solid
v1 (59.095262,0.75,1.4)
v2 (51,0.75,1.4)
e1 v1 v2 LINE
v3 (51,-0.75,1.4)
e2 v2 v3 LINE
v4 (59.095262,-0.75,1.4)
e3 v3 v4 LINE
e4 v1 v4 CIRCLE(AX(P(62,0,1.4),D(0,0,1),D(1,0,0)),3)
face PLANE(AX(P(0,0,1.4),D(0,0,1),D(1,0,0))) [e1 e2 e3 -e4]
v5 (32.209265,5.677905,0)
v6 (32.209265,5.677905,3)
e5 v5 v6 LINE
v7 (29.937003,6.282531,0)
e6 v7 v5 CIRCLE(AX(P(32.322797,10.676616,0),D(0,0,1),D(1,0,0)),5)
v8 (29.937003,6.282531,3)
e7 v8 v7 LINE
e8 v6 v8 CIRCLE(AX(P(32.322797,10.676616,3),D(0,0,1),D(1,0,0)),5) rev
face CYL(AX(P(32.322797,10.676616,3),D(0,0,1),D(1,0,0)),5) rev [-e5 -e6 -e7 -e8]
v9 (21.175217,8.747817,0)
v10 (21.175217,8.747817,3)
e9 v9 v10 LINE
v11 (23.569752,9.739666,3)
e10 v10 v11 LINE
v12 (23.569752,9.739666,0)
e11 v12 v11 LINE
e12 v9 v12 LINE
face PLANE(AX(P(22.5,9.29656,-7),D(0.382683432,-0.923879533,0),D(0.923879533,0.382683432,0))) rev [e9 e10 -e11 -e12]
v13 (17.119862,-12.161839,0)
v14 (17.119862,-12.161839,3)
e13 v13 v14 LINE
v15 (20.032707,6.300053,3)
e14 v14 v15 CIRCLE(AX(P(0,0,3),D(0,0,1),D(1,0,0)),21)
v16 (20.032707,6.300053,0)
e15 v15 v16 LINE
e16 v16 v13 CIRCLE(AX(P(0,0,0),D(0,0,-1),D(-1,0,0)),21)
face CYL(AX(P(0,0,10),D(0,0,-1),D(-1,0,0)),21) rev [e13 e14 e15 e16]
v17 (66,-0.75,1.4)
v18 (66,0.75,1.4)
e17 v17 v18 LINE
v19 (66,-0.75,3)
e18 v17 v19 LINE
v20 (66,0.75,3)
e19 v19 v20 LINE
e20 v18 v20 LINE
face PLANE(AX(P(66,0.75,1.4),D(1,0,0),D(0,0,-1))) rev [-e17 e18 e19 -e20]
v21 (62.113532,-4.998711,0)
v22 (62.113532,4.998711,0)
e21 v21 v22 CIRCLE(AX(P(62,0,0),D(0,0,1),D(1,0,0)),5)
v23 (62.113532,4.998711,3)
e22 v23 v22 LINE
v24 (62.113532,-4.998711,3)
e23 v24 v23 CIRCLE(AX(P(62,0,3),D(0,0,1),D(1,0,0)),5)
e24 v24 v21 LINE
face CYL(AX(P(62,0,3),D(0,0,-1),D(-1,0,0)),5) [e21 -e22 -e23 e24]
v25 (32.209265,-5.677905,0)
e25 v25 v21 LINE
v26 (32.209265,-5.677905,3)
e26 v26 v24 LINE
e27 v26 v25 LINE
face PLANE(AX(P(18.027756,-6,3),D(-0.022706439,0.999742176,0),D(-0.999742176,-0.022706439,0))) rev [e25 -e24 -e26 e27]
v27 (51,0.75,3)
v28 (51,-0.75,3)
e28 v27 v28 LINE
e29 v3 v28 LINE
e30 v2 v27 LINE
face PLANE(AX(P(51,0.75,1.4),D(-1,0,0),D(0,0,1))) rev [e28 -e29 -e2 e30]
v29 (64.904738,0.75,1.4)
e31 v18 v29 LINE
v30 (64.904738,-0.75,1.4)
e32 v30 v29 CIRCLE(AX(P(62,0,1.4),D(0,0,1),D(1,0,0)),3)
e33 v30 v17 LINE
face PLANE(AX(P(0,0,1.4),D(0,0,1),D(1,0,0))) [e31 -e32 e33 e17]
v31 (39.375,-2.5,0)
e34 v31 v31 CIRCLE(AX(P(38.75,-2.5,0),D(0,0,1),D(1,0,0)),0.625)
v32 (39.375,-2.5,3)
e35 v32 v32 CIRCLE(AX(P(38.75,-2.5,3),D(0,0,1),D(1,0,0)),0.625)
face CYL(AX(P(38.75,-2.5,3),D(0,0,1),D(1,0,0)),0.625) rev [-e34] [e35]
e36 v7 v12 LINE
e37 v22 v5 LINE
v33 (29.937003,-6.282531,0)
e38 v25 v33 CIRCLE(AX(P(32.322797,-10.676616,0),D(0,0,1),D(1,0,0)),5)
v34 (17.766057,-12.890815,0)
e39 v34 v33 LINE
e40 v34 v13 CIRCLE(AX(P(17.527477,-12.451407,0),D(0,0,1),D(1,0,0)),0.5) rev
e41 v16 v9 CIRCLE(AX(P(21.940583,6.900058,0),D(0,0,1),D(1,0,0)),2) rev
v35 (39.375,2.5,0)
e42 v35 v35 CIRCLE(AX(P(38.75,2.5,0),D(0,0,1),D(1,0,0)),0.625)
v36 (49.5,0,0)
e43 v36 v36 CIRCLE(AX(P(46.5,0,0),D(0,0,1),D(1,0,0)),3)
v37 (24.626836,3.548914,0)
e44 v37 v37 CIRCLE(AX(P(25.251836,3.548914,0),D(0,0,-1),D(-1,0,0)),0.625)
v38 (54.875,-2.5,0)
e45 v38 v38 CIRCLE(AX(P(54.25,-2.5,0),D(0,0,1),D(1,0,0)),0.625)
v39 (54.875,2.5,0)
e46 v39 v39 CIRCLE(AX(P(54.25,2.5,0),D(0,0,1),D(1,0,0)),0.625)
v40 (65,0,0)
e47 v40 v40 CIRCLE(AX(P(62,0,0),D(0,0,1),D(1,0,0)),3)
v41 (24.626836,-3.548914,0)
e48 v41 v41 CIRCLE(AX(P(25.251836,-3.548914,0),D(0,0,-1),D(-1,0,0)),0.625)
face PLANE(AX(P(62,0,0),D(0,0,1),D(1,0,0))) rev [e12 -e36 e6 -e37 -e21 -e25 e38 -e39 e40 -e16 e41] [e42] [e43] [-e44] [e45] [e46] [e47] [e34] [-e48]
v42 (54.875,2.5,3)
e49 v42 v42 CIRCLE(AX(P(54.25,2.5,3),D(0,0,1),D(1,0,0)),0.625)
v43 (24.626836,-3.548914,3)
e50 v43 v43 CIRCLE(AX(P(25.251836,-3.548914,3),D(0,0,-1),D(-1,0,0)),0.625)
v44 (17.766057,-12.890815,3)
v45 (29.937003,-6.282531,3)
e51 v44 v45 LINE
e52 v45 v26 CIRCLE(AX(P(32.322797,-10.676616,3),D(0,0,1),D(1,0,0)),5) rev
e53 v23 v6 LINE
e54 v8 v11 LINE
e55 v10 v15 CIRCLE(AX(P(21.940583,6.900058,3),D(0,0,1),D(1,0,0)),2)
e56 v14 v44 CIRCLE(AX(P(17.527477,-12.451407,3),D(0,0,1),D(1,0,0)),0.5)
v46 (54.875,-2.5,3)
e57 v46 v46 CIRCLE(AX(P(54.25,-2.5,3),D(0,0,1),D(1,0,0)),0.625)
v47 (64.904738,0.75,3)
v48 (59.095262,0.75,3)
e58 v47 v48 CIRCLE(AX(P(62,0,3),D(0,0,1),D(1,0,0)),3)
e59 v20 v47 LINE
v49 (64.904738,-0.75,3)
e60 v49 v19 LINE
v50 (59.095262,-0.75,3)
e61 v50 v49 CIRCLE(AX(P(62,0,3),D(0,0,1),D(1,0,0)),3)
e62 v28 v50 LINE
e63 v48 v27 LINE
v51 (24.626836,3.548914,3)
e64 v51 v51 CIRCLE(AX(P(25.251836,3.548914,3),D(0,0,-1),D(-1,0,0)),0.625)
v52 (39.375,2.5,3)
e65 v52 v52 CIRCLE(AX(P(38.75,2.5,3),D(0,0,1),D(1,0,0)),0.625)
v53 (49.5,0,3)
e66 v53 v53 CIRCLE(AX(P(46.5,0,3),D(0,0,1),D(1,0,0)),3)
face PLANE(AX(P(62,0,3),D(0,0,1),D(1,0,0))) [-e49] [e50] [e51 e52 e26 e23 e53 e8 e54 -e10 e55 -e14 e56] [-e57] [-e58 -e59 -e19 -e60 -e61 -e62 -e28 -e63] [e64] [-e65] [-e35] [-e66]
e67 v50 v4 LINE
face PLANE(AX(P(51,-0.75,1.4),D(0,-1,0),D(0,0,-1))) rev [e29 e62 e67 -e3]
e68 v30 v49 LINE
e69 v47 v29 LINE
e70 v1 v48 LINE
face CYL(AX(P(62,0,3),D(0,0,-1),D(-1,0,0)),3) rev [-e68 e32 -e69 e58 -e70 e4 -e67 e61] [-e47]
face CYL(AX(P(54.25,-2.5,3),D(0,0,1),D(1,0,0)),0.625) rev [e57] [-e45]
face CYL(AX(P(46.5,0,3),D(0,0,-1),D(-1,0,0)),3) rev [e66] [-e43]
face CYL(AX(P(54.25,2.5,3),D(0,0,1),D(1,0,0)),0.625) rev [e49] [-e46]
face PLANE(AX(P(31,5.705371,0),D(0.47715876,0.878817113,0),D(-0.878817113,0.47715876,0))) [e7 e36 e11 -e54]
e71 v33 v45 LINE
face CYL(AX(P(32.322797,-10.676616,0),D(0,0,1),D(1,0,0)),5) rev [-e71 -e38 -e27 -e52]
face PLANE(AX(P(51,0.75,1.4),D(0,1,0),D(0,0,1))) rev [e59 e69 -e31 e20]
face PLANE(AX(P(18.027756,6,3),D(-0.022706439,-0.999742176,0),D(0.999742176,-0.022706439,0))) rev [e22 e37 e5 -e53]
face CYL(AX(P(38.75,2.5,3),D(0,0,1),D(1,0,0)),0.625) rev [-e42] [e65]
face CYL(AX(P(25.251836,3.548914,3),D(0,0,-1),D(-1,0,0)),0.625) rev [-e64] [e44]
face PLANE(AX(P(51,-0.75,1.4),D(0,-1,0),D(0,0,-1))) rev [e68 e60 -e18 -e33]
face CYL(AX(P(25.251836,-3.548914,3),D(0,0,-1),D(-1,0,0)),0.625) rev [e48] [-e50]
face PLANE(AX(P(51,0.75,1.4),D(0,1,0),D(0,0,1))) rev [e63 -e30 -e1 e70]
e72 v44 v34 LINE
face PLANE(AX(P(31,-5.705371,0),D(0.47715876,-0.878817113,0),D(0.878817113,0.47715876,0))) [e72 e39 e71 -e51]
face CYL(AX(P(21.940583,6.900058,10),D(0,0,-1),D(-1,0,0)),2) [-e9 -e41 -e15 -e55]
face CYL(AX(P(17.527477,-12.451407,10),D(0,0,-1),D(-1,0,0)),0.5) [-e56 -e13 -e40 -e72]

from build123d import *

# Parameters (mm, degrees)
SKETCH1_R                  = 14
SKETCH1_R_2                = 3
BOSS_EXTRUDE1_DEPTH        = 3
M1_6_CLEARANCE_HOLE2_D     = 1.8
M1_6_CLEARANCE_HOLE2_DEPTH = 11.5
CIRPATTERN1_COUNT          = 12
TROU_TARAUD_M1_61_D        = 1.25
CHAMFER2_SIZE              = 11.586303909
ESQUISSE1_R                = 21
ENL_V_MAT_EXTRU_1_DEPTH    = 10
ESQUISSE3_R                = 0.625
ENL_V_MAT_EXTRU_2_DEPTH    = 69.11418111
ESQUISSE5_W                = 15
ESQUISSE5_H                = 1.5
ENL_V_MAT_EXTRU_3_DEPTH    = 1.6
ENL_V_START                = -10
ENL_V_MAT_EXTRU_4_DEPTH    = 10
CONG_1_R                   = 2
BOSS_EXTRU_1_START         = -3
BOSS_EXTRU_1_DEPTH         = 3
CONG_2_R                   = 5
CONG_3_R                   = 0.5


with BuildPart() as part:
    # Sketch1 → Boss-Extrude1 (new body)
    with BuildSketch(Plane.XY):
        with BuildLine():
            Line((18.027756377, 6), (62.113532193, 4.998710878))
            ThreePointArc((62.113532193, 4.998710878), (67, 0), (62.113532193, -4.998710878))
            Line((62.113532193, -4.998710878), (18.027756377, -6))
            ThreePointArc((18.027756377, -6), (-19, 0), (18.027756377, 6))
        make_face()
        Circle(SKETCH1_R, mode=Mode.SUBTRACT)
        with Locations((46.5, 0)):
            Circle(SKETCH1_R_2, mode=Mode.SUBTRACT)
        with Locations((62, 0)):
            Circle(SKETCH1_R_2, mode=Mode.SUBTRACT)
    extrude(amount=BOSS_EXTRUDE1_DEPTH)

    # M1.6 Clearance Hole2
    with Locations(Plane.XY.offset(3)):
        with Locations((0, 16.5)):
            m1_6_clearance_hole2 = Hole(M1_6_CLEARANCE_HOLE2_D / 2, depth=M1_6_CLEARANCE_HOLE2_DEPTH)

    # CirPattern1: M1.6 Clearance Hole2 ×12 about axis
    cirpattern1_axis = Axis((0, 0, 0), (0, 0, 1))
    for i in range(1, CIRPATTERN1_COUNT):
        add(m1_6_clearance_hole2.rotate(cirpattern1_axis, i * 360 / CIRPATTERN1_COUNT), mode=Mode.SUBTRACT)

    # Trou taraudé M1.61 (through all)
    with Locations(Plane.XY.offset(3)):
        with Locations((38.75, 2.5), (54.25, -2.5), (38.75, -2.5), (54.25, 2.5)):
            Hole(TROU_TARAUD_M1_61_D / 2)

    # Chamfer2
    # the kernel refuses this chamfer: 11.586303909, 7 mm, written as the material it adds along each edge
    with BuildSketch(Plane(origin=(18.027756377, -6, 0), x_dir=(-0.5533672821308996, -0.8329373632315106, 0), z_dir=(0, 0, 1))) as chamfer2_piece_1:
        with BuildLine():
            Line((9.95669274, 0), (-CHAMFER2_SIZE * 0.572137651701, CHAMFER2_SIZE * 0.820157611387))
            Line((-CHAMFER2_SIZE * 0.572137651701, CHAMFER2_SIZE * 0.820157611387), (0, 0))
            ThreePointArc((0, 0), (5.187993151, 0.662647785), (9.95669274, 0))
        make_face()
    extrude(amount=3)
    with BuildSketch(Plane(origin=(18.027756377, 6, 0), x_dir=(0.9997421755844867, -0.02270643868151269, 0), z_dir=(0, 0, 1))) as chamfer2_piece_2:
        with BuildLine():
            Line((CHAMFER2_SIZE, 0), (-5.696598803, 8.166057335))
            ThreePointArc((-5.696598803, 8.166057335), (-2.424770594, 4.634097818), (0, 0))
            Line((0, 0), (CHAMFER2_SIZE, 0))
        make_face()
    extrude(amount=3)

    # Esquisse1 → Enlèv. mat.-Extru.1 (cut)
    with BuildSketch(Plane(origin=(0, 0, 0), x_dir=(-1, 0, 0), z_dir=(0, 0, -1))):
        Circle(ESQUISSE1_R)
    extrude(amount=-ENL_V_MAT_EXTRU_1_DEPTH, mode=Mode.SUBTRACT)

    # Esquisse3 → Enlèv. mat.-Extru.2 (cut, through all)
    with BuildSketch(Plane(origin=(0, 0, 0), x_dir=(-1, 0, 0), z_dir=(0, 0, -1))):
        with Locations((-25.251835753, 3.548914074)):
            Circle(ESQUISSE3_R)
        with Locations((-25.251835753, -3.548914074)):
            Circle(ESQUISSE3_R)
    extrude(amount=-ENL_V_MAT_EXTRU_2_DEPTH, mode=Mode.SUBTRACT)

    # Esquisse5 → Enlèv. mat.-Extru.3 (cut)
    with BuildSketch(Plane.XY.offset(3)):
        with Locations((58.5, 0)):
            Rectangle(ESQUISSE5_W, ESQUISSE5_H)
    extrude(amount=-ENL_V_MAT_EXTRU_3_DEPTH, mode=Mode.SUBTRACT)

    # Esquisse9 → Enlèv. mat.-Extru.4 (cut)
    with BuildSketch(Plane.XY.offset(3).offset(ENL_V_START)):
        with BuildLine():
            Line((22.5, 9.296560112), (19.409678401, 8.016506993))
            ThreePointArc((19.409678401, 8.016506993), (18.459529223, 10.012281501), (17.304864396, 11.897128572))
            Line((17.304864396, 11.897128572), (22.5, 9.296560112))
        make_face()
    extrude(amount=ENL_V_MAT_EXTRU_4_DEPTH, mode=Mode.SUBTRACT)

    # Congé1
    cong_1_edges = [part.edges().sort_by_distance(p)[0] for p in [
        (19.409678401, 8.016506993, 1.5),
    ]]
    fillet(cong_1_edges, radius=CONG_1_R)

    # Esquisse10 → Boss.-Extru.1 (add)
    with BuildSketch(Plane.XY.offset(3).offset(BOSS_EXTRU_1_START)):
        Polygon((31, 5.705370583), (23.569752194, 9.739665979), (22.5, 9.296560112), (29.611073054, 5.736916301), align=None)
        with BuildLine():
            Line((31, -5.705370583), (29.611073054, -5.736916301))
            Line((29.611073054, -5.736916301), (17.304864396, -11.897128572))
            ThreePointArc((17.304864396, -11.897128572), (16.480984157, -13.014498116), (15.585077408, -14.074990664))
            Line((15.585077408, -14.074990664), (31, -5.705370583))
        make_face()
    extrude(amount=BOSS_EXTRU_1_DEPTH)

    # Congé2
    cong_2_edges = [part.edges().sort_by_distance(p)[0] for p in [
        (31, 5.705370583, 1.5),
        (31, -5.705370583, 1.5),
    ]]
    fillet(cong_2_edges, radius=CONG_2_R)

    # Congé3
    cong_3_edges = [part.edges().sort_by_distance(p)[0] for p in [
        (15.585077408, -14.074990664, 1.5),
    ]]
    fillet(cong_3_edges, radius=CONG_3_R)


solid = part.part
